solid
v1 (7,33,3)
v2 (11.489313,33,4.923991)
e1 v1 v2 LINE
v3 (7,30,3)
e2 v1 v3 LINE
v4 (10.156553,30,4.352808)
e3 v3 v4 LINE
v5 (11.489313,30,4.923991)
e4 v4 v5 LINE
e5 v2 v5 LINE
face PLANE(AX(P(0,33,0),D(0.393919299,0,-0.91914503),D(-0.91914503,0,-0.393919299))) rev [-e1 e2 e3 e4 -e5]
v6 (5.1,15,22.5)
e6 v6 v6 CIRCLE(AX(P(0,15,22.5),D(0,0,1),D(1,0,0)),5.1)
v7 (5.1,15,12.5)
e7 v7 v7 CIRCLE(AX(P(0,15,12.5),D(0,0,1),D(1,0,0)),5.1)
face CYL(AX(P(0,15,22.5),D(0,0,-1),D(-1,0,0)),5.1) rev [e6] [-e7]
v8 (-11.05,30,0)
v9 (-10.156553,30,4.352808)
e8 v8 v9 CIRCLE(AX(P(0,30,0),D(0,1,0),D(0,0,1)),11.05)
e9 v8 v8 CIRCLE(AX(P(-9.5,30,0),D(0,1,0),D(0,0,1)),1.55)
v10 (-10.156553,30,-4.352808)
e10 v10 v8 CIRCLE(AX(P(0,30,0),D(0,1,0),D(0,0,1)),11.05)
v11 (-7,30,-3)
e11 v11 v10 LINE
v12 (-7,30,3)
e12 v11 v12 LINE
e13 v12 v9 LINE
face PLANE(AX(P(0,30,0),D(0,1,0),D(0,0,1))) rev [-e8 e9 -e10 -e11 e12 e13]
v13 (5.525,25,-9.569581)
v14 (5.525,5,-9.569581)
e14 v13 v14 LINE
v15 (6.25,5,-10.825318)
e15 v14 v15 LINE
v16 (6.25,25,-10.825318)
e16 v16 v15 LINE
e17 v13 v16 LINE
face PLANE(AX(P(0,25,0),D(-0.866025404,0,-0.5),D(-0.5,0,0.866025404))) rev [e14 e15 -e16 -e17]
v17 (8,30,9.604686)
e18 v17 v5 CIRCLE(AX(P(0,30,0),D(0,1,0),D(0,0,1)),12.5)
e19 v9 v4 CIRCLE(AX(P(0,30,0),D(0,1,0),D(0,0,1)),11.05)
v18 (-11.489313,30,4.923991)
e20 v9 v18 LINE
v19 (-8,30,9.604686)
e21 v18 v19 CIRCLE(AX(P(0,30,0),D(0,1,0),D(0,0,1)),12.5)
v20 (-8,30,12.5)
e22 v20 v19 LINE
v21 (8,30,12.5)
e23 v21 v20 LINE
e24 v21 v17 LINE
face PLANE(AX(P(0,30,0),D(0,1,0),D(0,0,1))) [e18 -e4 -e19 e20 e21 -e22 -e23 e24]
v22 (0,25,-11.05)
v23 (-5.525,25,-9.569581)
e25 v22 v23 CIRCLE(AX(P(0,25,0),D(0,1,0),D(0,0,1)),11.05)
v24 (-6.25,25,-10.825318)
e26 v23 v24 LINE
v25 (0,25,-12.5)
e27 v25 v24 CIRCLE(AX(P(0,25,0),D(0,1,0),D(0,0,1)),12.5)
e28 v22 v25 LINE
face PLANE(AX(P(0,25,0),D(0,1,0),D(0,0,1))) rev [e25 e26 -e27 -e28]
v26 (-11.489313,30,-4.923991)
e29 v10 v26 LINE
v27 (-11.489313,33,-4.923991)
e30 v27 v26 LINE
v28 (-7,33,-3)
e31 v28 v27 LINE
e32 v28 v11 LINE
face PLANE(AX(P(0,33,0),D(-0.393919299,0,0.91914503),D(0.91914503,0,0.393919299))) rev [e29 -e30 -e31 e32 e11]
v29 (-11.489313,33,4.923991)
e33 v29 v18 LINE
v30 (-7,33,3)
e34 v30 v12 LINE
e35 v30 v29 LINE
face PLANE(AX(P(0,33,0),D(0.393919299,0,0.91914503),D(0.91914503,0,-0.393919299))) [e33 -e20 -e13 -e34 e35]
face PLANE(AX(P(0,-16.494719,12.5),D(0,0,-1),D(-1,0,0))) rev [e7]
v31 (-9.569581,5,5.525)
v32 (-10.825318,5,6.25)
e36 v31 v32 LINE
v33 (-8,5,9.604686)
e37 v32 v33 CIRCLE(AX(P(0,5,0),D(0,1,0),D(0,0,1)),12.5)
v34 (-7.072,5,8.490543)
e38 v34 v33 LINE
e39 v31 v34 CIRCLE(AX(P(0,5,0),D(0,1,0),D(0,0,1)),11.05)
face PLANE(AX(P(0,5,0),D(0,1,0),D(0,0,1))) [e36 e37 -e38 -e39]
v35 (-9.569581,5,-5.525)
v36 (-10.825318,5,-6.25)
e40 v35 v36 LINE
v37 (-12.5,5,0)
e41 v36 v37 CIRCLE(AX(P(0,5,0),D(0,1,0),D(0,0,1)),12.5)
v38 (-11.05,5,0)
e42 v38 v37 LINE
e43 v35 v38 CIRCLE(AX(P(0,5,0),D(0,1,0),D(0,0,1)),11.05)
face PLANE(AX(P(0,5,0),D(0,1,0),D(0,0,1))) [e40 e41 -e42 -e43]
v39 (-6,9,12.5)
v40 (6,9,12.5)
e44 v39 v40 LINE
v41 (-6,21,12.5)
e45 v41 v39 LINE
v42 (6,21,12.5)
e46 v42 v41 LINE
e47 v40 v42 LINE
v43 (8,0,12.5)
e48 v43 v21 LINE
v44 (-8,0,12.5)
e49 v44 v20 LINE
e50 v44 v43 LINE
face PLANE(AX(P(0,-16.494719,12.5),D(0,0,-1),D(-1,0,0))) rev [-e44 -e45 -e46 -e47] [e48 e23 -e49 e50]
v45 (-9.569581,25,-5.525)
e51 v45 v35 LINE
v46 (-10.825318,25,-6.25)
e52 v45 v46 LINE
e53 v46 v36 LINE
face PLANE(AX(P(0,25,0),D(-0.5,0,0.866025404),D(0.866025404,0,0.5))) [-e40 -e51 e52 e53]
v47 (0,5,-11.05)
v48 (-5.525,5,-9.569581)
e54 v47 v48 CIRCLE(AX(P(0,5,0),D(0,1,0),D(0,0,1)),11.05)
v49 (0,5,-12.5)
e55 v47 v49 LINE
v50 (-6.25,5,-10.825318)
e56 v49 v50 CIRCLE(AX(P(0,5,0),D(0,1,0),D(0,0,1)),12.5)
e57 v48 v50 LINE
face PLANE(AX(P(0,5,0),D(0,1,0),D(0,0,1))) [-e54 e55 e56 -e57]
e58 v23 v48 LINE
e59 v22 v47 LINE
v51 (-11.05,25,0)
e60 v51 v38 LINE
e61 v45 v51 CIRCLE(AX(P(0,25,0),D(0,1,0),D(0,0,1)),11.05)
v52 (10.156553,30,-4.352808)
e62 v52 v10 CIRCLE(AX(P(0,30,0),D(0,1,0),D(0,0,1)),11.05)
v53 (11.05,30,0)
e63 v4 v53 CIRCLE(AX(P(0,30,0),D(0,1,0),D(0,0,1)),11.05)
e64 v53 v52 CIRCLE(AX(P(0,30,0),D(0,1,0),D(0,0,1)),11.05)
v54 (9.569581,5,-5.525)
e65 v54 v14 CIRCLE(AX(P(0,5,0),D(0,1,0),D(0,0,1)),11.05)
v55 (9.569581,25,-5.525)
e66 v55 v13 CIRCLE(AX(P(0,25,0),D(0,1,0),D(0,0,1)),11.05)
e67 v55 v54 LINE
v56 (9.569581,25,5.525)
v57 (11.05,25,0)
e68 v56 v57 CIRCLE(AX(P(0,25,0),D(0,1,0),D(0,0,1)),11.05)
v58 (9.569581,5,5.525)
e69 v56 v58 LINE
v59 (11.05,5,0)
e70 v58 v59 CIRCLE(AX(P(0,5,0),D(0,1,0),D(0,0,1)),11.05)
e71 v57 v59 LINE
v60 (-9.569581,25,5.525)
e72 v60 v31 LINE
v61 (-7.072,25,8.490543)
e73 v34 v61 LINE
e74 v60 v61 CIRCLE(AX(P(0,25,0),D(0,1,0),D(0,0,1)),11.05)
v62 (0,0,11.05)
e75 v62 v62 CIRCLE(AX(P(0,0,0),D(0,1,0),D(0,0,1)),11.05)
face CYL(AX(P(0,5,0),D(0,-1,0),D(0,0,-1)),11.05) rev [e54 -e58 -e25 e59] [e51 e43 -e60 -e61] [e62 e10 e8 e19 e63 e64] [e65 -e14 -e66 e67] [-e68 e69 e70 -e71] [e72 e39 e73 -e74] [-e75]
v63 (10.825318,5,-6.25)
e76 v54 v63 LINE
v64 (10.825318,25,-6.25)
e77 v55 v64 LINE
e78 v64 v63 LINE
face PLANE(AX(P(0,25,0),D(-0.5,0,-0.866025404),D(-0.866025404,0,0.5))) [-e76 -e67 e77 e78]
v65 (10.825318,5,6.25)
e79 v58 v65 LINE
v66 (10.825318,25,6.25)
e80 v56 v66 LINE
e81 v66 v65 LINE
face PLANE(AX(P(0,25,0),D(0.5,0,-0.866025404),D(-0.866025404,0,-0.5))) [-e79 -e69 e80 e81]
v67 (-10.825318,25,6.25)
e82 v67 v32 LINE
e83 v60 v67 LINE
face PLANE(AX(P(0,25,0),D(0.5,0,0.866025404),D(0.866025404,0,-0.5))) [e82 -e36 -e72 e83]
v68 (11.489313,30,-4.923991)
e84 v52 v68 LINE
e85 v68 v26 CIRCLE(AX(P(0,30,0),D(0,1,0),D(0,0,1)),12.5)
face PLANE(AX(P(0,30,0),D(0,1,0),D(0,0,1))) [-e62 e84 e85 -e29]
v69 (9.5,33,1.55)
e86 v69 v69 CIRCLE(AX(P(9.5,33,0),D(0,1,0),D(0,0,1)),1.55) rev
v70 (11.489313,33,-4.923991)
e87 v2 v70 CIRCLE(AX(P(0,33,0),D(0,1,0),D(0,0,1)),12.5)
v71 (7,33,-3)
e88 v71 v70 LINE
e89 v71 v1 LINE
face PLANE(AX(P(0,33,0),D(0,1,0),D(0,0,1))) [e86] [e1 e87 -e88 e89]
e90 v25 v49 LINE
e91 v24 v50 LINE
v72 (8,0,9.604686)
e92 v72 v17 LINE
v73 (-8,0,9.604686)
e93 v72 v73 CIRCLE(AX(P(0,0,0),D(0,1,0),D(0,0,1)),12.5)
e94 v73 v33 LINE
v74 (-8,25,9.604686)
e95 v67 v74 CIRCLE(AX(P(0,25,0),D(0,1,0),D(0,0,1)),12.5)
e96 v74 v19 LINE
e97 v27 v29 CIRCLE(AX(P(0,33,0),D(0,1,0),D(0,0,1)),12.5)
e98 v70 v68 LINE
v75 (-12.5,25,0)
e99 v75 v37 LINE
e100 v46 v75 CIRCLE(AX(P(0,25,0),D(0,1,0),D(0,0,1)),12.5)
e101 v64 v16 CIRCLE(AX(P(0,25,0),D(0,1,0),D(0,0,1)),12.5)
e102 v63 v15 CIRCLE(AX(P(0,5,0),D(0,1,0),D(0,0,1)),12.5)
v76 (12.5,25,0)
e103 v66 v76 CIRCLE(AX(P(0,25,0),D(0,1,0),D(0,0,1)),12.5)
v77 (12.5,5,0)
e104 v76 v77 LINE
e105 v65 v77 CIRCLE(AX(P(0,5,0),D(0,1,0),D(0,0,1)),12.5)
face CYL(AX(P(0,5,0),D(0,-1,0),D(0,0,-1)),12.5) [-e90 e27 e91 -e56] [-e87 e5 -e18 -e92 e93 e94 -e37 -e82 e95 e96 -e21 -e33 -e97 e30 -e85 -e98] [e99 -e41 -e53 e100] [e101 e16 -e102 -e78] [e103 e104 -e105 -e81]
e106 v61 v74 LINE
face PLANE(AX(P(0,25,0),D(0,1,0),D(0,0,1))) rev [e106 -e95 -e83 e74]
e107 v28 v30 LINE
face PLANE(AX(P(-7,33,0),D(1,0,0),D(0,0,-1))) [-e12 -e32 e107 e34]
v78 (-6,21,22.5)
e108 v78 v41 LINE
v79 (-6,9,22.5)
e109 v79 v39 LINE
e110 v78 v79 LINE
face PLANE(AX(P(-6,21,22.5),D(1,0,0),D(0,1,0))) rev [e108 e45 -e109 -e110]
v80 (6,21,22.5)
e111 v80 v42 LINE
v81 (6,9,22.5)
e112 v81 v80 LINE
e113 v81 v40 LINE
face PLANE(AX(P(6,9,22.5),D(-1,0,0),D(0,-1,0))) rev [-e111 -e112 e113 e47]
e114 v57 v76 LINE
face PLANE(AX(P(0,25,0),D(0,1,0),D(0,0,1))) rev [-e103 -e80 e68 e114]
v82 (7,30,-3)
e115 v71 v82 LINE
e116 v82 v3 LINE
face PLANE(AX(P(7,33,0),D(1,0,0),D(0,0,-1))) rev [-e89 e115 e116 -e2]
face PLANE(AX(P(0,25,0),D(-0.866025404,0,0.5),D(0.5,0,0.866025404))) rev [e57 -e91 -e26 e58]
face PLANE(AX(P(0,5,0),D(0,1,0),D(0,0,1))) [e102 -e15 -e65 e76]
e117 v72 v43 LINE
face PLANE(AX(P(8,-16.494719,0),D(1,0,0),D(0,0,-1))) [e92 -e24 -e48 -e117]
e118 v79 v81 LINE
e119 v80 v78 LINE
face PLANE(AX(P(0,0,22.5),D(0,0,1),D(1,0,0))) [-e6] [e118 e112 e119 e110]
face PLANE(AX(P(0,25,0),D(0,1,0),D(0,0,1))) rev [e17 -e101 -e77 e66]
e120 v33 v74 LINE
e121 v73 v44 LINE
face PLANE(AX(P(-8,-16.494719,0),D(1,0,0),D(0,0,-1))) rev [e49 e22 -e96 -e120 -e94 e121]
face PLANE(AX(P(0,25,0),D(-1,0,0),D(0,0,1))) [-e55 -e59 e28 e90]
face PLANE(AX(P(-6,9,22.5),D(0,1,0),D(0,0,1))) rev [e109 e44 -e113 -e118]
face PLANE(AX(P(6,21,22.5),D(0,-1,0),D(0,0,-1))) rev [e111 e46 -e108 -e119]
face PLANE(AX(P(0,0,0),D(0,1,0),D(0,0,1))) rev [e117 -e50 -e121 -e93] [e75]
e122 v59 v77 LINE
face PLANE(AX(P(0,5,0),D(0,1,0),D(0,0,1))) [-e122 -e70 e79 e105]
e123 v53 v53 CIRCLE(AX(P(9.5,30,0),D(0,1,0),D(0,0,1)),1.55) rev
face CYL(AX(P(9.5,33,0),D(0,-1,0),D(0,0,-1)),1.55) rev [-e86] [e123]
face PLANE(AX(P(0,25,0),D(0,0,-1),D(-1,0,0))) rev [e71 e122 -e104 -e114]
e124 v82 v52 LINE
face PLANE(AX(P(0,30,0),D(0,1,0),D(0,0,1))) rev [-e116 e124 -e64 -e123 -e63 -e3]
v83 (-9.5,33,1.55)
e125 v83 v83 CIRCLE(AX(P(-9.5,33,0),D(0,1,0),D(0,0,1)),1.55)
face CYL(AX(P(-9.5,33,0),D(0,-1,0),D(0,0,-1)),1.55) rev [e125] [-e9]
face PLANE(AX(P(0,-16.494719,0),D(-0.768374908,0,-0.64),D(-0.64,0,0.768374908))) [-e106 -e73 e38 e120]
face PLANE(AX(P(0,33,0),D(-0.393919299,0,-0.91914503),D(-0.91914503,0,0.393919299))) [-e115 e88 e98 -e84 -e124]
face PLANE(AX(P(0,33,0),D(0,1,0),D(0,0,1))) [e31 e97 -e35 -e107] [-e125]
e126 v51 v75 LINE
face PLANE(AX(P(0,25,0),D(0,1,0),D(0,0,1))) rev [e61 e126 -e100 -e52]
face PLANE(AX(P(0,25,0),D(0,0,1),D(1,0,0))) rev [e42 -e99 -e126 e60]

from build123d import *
from build123d.topology import SkipClean

# Parameters (mm, degrees)
SKETCH_1_R      = 12.5
SKETCH_1_R_2    = 11.05
EXTRUDE_1_DEPTH = 5
EXTRUDE_2_DEPTH = 20
SKETCH_3_R      = 12.5
SKETCH_3_R_2    = 11.05
EXTRUDE_3_DEPTH = 5
SKETCH_4_R      = 1.55
EXTRUDE_5_DEPTH = 3
EXTRUDE_START   = -30
EXTRUDE_7_DEPTH = 30
SKETCH_7_W      = 12
SKETCH_7_H      = 12
SKETCH_7_R      = 5.1
EXTRUDE_8_DEPTH = 10


with BuildPart() as part:
    # 草图1 → 凸台-拉伸1 (new body)
    with BuildSketch(Plane(origin=(0, 0, 0), x_dir=(1, 0, 0), z_dir=(0, 1, 0))):
        with Locations(Location((0, 0, 0), (0, 0, 270))):
            Circle(SKETCH_1_R)
        with Locations(Location((0, 0, 0), (0, 0, 270))):
            Circle(SKETCH_1_R_2, mode=Mode.SUBTRACT)
    extrude(amount=EXTRUDE_1_DEPTH)

    # 草图2 → 凸台-拉伸2 (add)
    with SkipClean():  # the faces are left unmerged after this step: merging them gives an invalid solid
        with BuildSketch(Plane(origin=(0, 5, 0), x_dir=(1, 0, 0), z_dir=(0, 1, 0))):
            with BuildLine():
                Line((-10.825318, 6.25), (-9.569581, 5.525))
                ThreePointArc((-9.569581, 5.525), (-7.81353, 7.81353), (-5.525, 9.569581))
                Line((-5.525, 9.569581), (-6.25, 10.825318))
                ThreePointArc((-6.25, 10.825318), (-8.838835, 8.838835), (-10.825318, 6.25))
            make_face()
            with BuildLine():
                Line((0, 12.5), (0, 11.05))
                ThreePointArc((0, 11.05), (2.85995, 10.67348), (5.525, 9.569581))
                Line((5.525, 9.569581), (6.25, 10.825318))
                ThreePointArc((6.25, 10.825318), (3.235238, 12.074073), (0, 12.5))
            make_face()
            with BuildLine():
                Line((10.825318, 6.25), (9.569581, 5.525))
                ThreePointArc((9.569581, 5.525), (10.67348, 2.85995), (11.05, 0))
                Line((11.05, 0), (12.5, 0))
                ThreePointArc((12.5, 0), (12.074073, 3.235238), (10.825318, 6.25))
            make_face()
            with BuildLine():
                Line((10.825318, -6.25), (9.569581, -5.525))
                ThreePointArc((9.569581, -5.525), (7.81353, -7.81353), (5.525, -9.569581))
                Line((5.525, -9.569581), (6.25, -10.825318))
                ThreePointArc((6.25, -10.825318), (8.838835, -8.838835), (10.825318, -6.25))
            make_face()
            with BuildLine():
                Line((0, -12.5), (0, -11.05))
                ThreePointArc((0, -11.05), (-2.85995, -10.67348), (-5.525, -9.569581))
                Line((-5.525, -9.569581), (-6.25, -10.825318))
                ThreePointArc((-6.25, -10.825318), (-3.235238, -12.074073), (0, -12.5))
            make_face()
            with BuildLine():
                Line((-10.825318, -6.25), (-9.569581, -5.525))
                ThreePointArc((-9.569581, -5.525), (-10.67348, -2.85995), (-11.05, 0))
                Line((-11.05, 0), (-12.5, 0))
                ThreePointArc((-12.5, 0), (-12.074073, -3.235238), (-10.825318, -6.25))
            make_face()
        extrude(amount=EXTRUDE_2_DEPTH)

    # 草图3 → 凸台-拉伸3 (add)
    with SkipClean():  # the faces are left unmerged after this step: merging them gives an invalid solid
        with BuildSketch(Plane(origin=(0, 25, 0), x_dir=(1, 0, 0), z_dir=(0, 1, 0))):
            with Locations(Location((0, 0, 0), (0, 0, 270))):
                Circle(SKETCH_3_R)
            with Locations(Location((0, 0, 0), (0, 0, 270))):
                Circle(SKETCH_3_R_2, mode=Mode.SUBTRACT)
        extrude(amount=EXTRUDE_3_DEPTH)

    # 草图4 → 凸台-拉伸5 (add)
    # profile 1 of 2: a face of its own
    with SkipClean():  # the faces are left unmerged after this step: merging them gives an invalid solid
        with BuildSketch(Plane(origin=(0, 30, 0), x_dir=(1, 0, 0), z_dir=(0, 1, 0))):
            with BuildLine():
                Line((-7, -3), (-7, 3))
                Line((-7, 3), (-11.489313, 4.923991))
                ThreePointArc((-11.489313, 4.923991), (-12.5, 0), (-11.489313, -4.923991))
                Line((-11.489313, -4.923991), (-7, -3))
            make_face()
            with Locations(Location((-9.5, 0, 0), (0, 0, 179.999298))):
                Circle(SKETCH_4_R, mode=Mode.SUBTRACT)
        # profile 2 of 2: a face of its own
        with BuildSketch(Plane(origin=(0, 30, 0), x_dir=(1, 0, 0), z_dir=(0, 1, 0))):
            with BuildLine():
                Line((7, -3), (11.489313, -4.923991))
                ThreePointArc((11.489313, -4.923991), (12.5, 0), (11.489313, 4.923991))
                Line((11.489313, 4.923991), (7, 3))
                Line((7, 3), (7, -3))
            make_face()
            with Locations((9.5, 0)):
                Circle(SKETCH_4_R, mode=Mode.SUBTRACT)
        extrude(amount=EXTRUDE_5_DEPTH)

    # 凸台-拉伸7: read off the stored shape, not the designer's step
    # 凸台-拉伸7 outline → 凸台-拉伸7 (add)
    with BuildSketch(Plane(origin=(0, 30, 0), x_dir=(1, 0, 0), z_dir=(0, 1, 0)).offset(EXTRUDE_START)):
        with BuildLine():
            ThreePointArc((-5.525, -9.569581), (-6.321565, -9.06313), (-7.072, -8.490543))
            Line((-7.072, -8.490543), (-8, -9.604686))
            Line((-8, -9.604686), (-8, -12.5))
            Line((-8, -12.5), (0, -12.5))
            ThreePointArc((0, -12.5), (-3.235238, -12.074073), (-6.25, -10.825318))
            Line((-6.25, -10.825318), (-5.525, -9.569581))
        make_face()
        with BuildLine():
            ThreePointArc((5.525, -9.569581), (2.85995, -10.67348), (0, -11.05))
            Line((0, -11.05), (0, -12.5))
            Line((0, -12.5), (8, -12.5))
            Line((8, -12.5), (8, -9.604686))
            ThreePointArc((8, -9.604686), (7.151092, -10.252409), (6.25, -10.825318))
            Line((6.25, -10.825318), (5.525, -9.569581))
        make_face()
    extrude(amount=EXTRUDE_7_DEPTH)

    # 草图7 → 凸台-拉伸8 (add)
    with BuildSketch(Plane.XY.offset(12.5)):
        with Locations((0, 15)):
            Rectangle(SKETCH_7_W, SKETCH_7_H)
        with Locations((0, 15)):
            Circle(SKETCH_7_R, mode=Mode.SUBTRACT)
    extrude(amount=EXTRUDE_8_DEPTH)


solid = part.part
